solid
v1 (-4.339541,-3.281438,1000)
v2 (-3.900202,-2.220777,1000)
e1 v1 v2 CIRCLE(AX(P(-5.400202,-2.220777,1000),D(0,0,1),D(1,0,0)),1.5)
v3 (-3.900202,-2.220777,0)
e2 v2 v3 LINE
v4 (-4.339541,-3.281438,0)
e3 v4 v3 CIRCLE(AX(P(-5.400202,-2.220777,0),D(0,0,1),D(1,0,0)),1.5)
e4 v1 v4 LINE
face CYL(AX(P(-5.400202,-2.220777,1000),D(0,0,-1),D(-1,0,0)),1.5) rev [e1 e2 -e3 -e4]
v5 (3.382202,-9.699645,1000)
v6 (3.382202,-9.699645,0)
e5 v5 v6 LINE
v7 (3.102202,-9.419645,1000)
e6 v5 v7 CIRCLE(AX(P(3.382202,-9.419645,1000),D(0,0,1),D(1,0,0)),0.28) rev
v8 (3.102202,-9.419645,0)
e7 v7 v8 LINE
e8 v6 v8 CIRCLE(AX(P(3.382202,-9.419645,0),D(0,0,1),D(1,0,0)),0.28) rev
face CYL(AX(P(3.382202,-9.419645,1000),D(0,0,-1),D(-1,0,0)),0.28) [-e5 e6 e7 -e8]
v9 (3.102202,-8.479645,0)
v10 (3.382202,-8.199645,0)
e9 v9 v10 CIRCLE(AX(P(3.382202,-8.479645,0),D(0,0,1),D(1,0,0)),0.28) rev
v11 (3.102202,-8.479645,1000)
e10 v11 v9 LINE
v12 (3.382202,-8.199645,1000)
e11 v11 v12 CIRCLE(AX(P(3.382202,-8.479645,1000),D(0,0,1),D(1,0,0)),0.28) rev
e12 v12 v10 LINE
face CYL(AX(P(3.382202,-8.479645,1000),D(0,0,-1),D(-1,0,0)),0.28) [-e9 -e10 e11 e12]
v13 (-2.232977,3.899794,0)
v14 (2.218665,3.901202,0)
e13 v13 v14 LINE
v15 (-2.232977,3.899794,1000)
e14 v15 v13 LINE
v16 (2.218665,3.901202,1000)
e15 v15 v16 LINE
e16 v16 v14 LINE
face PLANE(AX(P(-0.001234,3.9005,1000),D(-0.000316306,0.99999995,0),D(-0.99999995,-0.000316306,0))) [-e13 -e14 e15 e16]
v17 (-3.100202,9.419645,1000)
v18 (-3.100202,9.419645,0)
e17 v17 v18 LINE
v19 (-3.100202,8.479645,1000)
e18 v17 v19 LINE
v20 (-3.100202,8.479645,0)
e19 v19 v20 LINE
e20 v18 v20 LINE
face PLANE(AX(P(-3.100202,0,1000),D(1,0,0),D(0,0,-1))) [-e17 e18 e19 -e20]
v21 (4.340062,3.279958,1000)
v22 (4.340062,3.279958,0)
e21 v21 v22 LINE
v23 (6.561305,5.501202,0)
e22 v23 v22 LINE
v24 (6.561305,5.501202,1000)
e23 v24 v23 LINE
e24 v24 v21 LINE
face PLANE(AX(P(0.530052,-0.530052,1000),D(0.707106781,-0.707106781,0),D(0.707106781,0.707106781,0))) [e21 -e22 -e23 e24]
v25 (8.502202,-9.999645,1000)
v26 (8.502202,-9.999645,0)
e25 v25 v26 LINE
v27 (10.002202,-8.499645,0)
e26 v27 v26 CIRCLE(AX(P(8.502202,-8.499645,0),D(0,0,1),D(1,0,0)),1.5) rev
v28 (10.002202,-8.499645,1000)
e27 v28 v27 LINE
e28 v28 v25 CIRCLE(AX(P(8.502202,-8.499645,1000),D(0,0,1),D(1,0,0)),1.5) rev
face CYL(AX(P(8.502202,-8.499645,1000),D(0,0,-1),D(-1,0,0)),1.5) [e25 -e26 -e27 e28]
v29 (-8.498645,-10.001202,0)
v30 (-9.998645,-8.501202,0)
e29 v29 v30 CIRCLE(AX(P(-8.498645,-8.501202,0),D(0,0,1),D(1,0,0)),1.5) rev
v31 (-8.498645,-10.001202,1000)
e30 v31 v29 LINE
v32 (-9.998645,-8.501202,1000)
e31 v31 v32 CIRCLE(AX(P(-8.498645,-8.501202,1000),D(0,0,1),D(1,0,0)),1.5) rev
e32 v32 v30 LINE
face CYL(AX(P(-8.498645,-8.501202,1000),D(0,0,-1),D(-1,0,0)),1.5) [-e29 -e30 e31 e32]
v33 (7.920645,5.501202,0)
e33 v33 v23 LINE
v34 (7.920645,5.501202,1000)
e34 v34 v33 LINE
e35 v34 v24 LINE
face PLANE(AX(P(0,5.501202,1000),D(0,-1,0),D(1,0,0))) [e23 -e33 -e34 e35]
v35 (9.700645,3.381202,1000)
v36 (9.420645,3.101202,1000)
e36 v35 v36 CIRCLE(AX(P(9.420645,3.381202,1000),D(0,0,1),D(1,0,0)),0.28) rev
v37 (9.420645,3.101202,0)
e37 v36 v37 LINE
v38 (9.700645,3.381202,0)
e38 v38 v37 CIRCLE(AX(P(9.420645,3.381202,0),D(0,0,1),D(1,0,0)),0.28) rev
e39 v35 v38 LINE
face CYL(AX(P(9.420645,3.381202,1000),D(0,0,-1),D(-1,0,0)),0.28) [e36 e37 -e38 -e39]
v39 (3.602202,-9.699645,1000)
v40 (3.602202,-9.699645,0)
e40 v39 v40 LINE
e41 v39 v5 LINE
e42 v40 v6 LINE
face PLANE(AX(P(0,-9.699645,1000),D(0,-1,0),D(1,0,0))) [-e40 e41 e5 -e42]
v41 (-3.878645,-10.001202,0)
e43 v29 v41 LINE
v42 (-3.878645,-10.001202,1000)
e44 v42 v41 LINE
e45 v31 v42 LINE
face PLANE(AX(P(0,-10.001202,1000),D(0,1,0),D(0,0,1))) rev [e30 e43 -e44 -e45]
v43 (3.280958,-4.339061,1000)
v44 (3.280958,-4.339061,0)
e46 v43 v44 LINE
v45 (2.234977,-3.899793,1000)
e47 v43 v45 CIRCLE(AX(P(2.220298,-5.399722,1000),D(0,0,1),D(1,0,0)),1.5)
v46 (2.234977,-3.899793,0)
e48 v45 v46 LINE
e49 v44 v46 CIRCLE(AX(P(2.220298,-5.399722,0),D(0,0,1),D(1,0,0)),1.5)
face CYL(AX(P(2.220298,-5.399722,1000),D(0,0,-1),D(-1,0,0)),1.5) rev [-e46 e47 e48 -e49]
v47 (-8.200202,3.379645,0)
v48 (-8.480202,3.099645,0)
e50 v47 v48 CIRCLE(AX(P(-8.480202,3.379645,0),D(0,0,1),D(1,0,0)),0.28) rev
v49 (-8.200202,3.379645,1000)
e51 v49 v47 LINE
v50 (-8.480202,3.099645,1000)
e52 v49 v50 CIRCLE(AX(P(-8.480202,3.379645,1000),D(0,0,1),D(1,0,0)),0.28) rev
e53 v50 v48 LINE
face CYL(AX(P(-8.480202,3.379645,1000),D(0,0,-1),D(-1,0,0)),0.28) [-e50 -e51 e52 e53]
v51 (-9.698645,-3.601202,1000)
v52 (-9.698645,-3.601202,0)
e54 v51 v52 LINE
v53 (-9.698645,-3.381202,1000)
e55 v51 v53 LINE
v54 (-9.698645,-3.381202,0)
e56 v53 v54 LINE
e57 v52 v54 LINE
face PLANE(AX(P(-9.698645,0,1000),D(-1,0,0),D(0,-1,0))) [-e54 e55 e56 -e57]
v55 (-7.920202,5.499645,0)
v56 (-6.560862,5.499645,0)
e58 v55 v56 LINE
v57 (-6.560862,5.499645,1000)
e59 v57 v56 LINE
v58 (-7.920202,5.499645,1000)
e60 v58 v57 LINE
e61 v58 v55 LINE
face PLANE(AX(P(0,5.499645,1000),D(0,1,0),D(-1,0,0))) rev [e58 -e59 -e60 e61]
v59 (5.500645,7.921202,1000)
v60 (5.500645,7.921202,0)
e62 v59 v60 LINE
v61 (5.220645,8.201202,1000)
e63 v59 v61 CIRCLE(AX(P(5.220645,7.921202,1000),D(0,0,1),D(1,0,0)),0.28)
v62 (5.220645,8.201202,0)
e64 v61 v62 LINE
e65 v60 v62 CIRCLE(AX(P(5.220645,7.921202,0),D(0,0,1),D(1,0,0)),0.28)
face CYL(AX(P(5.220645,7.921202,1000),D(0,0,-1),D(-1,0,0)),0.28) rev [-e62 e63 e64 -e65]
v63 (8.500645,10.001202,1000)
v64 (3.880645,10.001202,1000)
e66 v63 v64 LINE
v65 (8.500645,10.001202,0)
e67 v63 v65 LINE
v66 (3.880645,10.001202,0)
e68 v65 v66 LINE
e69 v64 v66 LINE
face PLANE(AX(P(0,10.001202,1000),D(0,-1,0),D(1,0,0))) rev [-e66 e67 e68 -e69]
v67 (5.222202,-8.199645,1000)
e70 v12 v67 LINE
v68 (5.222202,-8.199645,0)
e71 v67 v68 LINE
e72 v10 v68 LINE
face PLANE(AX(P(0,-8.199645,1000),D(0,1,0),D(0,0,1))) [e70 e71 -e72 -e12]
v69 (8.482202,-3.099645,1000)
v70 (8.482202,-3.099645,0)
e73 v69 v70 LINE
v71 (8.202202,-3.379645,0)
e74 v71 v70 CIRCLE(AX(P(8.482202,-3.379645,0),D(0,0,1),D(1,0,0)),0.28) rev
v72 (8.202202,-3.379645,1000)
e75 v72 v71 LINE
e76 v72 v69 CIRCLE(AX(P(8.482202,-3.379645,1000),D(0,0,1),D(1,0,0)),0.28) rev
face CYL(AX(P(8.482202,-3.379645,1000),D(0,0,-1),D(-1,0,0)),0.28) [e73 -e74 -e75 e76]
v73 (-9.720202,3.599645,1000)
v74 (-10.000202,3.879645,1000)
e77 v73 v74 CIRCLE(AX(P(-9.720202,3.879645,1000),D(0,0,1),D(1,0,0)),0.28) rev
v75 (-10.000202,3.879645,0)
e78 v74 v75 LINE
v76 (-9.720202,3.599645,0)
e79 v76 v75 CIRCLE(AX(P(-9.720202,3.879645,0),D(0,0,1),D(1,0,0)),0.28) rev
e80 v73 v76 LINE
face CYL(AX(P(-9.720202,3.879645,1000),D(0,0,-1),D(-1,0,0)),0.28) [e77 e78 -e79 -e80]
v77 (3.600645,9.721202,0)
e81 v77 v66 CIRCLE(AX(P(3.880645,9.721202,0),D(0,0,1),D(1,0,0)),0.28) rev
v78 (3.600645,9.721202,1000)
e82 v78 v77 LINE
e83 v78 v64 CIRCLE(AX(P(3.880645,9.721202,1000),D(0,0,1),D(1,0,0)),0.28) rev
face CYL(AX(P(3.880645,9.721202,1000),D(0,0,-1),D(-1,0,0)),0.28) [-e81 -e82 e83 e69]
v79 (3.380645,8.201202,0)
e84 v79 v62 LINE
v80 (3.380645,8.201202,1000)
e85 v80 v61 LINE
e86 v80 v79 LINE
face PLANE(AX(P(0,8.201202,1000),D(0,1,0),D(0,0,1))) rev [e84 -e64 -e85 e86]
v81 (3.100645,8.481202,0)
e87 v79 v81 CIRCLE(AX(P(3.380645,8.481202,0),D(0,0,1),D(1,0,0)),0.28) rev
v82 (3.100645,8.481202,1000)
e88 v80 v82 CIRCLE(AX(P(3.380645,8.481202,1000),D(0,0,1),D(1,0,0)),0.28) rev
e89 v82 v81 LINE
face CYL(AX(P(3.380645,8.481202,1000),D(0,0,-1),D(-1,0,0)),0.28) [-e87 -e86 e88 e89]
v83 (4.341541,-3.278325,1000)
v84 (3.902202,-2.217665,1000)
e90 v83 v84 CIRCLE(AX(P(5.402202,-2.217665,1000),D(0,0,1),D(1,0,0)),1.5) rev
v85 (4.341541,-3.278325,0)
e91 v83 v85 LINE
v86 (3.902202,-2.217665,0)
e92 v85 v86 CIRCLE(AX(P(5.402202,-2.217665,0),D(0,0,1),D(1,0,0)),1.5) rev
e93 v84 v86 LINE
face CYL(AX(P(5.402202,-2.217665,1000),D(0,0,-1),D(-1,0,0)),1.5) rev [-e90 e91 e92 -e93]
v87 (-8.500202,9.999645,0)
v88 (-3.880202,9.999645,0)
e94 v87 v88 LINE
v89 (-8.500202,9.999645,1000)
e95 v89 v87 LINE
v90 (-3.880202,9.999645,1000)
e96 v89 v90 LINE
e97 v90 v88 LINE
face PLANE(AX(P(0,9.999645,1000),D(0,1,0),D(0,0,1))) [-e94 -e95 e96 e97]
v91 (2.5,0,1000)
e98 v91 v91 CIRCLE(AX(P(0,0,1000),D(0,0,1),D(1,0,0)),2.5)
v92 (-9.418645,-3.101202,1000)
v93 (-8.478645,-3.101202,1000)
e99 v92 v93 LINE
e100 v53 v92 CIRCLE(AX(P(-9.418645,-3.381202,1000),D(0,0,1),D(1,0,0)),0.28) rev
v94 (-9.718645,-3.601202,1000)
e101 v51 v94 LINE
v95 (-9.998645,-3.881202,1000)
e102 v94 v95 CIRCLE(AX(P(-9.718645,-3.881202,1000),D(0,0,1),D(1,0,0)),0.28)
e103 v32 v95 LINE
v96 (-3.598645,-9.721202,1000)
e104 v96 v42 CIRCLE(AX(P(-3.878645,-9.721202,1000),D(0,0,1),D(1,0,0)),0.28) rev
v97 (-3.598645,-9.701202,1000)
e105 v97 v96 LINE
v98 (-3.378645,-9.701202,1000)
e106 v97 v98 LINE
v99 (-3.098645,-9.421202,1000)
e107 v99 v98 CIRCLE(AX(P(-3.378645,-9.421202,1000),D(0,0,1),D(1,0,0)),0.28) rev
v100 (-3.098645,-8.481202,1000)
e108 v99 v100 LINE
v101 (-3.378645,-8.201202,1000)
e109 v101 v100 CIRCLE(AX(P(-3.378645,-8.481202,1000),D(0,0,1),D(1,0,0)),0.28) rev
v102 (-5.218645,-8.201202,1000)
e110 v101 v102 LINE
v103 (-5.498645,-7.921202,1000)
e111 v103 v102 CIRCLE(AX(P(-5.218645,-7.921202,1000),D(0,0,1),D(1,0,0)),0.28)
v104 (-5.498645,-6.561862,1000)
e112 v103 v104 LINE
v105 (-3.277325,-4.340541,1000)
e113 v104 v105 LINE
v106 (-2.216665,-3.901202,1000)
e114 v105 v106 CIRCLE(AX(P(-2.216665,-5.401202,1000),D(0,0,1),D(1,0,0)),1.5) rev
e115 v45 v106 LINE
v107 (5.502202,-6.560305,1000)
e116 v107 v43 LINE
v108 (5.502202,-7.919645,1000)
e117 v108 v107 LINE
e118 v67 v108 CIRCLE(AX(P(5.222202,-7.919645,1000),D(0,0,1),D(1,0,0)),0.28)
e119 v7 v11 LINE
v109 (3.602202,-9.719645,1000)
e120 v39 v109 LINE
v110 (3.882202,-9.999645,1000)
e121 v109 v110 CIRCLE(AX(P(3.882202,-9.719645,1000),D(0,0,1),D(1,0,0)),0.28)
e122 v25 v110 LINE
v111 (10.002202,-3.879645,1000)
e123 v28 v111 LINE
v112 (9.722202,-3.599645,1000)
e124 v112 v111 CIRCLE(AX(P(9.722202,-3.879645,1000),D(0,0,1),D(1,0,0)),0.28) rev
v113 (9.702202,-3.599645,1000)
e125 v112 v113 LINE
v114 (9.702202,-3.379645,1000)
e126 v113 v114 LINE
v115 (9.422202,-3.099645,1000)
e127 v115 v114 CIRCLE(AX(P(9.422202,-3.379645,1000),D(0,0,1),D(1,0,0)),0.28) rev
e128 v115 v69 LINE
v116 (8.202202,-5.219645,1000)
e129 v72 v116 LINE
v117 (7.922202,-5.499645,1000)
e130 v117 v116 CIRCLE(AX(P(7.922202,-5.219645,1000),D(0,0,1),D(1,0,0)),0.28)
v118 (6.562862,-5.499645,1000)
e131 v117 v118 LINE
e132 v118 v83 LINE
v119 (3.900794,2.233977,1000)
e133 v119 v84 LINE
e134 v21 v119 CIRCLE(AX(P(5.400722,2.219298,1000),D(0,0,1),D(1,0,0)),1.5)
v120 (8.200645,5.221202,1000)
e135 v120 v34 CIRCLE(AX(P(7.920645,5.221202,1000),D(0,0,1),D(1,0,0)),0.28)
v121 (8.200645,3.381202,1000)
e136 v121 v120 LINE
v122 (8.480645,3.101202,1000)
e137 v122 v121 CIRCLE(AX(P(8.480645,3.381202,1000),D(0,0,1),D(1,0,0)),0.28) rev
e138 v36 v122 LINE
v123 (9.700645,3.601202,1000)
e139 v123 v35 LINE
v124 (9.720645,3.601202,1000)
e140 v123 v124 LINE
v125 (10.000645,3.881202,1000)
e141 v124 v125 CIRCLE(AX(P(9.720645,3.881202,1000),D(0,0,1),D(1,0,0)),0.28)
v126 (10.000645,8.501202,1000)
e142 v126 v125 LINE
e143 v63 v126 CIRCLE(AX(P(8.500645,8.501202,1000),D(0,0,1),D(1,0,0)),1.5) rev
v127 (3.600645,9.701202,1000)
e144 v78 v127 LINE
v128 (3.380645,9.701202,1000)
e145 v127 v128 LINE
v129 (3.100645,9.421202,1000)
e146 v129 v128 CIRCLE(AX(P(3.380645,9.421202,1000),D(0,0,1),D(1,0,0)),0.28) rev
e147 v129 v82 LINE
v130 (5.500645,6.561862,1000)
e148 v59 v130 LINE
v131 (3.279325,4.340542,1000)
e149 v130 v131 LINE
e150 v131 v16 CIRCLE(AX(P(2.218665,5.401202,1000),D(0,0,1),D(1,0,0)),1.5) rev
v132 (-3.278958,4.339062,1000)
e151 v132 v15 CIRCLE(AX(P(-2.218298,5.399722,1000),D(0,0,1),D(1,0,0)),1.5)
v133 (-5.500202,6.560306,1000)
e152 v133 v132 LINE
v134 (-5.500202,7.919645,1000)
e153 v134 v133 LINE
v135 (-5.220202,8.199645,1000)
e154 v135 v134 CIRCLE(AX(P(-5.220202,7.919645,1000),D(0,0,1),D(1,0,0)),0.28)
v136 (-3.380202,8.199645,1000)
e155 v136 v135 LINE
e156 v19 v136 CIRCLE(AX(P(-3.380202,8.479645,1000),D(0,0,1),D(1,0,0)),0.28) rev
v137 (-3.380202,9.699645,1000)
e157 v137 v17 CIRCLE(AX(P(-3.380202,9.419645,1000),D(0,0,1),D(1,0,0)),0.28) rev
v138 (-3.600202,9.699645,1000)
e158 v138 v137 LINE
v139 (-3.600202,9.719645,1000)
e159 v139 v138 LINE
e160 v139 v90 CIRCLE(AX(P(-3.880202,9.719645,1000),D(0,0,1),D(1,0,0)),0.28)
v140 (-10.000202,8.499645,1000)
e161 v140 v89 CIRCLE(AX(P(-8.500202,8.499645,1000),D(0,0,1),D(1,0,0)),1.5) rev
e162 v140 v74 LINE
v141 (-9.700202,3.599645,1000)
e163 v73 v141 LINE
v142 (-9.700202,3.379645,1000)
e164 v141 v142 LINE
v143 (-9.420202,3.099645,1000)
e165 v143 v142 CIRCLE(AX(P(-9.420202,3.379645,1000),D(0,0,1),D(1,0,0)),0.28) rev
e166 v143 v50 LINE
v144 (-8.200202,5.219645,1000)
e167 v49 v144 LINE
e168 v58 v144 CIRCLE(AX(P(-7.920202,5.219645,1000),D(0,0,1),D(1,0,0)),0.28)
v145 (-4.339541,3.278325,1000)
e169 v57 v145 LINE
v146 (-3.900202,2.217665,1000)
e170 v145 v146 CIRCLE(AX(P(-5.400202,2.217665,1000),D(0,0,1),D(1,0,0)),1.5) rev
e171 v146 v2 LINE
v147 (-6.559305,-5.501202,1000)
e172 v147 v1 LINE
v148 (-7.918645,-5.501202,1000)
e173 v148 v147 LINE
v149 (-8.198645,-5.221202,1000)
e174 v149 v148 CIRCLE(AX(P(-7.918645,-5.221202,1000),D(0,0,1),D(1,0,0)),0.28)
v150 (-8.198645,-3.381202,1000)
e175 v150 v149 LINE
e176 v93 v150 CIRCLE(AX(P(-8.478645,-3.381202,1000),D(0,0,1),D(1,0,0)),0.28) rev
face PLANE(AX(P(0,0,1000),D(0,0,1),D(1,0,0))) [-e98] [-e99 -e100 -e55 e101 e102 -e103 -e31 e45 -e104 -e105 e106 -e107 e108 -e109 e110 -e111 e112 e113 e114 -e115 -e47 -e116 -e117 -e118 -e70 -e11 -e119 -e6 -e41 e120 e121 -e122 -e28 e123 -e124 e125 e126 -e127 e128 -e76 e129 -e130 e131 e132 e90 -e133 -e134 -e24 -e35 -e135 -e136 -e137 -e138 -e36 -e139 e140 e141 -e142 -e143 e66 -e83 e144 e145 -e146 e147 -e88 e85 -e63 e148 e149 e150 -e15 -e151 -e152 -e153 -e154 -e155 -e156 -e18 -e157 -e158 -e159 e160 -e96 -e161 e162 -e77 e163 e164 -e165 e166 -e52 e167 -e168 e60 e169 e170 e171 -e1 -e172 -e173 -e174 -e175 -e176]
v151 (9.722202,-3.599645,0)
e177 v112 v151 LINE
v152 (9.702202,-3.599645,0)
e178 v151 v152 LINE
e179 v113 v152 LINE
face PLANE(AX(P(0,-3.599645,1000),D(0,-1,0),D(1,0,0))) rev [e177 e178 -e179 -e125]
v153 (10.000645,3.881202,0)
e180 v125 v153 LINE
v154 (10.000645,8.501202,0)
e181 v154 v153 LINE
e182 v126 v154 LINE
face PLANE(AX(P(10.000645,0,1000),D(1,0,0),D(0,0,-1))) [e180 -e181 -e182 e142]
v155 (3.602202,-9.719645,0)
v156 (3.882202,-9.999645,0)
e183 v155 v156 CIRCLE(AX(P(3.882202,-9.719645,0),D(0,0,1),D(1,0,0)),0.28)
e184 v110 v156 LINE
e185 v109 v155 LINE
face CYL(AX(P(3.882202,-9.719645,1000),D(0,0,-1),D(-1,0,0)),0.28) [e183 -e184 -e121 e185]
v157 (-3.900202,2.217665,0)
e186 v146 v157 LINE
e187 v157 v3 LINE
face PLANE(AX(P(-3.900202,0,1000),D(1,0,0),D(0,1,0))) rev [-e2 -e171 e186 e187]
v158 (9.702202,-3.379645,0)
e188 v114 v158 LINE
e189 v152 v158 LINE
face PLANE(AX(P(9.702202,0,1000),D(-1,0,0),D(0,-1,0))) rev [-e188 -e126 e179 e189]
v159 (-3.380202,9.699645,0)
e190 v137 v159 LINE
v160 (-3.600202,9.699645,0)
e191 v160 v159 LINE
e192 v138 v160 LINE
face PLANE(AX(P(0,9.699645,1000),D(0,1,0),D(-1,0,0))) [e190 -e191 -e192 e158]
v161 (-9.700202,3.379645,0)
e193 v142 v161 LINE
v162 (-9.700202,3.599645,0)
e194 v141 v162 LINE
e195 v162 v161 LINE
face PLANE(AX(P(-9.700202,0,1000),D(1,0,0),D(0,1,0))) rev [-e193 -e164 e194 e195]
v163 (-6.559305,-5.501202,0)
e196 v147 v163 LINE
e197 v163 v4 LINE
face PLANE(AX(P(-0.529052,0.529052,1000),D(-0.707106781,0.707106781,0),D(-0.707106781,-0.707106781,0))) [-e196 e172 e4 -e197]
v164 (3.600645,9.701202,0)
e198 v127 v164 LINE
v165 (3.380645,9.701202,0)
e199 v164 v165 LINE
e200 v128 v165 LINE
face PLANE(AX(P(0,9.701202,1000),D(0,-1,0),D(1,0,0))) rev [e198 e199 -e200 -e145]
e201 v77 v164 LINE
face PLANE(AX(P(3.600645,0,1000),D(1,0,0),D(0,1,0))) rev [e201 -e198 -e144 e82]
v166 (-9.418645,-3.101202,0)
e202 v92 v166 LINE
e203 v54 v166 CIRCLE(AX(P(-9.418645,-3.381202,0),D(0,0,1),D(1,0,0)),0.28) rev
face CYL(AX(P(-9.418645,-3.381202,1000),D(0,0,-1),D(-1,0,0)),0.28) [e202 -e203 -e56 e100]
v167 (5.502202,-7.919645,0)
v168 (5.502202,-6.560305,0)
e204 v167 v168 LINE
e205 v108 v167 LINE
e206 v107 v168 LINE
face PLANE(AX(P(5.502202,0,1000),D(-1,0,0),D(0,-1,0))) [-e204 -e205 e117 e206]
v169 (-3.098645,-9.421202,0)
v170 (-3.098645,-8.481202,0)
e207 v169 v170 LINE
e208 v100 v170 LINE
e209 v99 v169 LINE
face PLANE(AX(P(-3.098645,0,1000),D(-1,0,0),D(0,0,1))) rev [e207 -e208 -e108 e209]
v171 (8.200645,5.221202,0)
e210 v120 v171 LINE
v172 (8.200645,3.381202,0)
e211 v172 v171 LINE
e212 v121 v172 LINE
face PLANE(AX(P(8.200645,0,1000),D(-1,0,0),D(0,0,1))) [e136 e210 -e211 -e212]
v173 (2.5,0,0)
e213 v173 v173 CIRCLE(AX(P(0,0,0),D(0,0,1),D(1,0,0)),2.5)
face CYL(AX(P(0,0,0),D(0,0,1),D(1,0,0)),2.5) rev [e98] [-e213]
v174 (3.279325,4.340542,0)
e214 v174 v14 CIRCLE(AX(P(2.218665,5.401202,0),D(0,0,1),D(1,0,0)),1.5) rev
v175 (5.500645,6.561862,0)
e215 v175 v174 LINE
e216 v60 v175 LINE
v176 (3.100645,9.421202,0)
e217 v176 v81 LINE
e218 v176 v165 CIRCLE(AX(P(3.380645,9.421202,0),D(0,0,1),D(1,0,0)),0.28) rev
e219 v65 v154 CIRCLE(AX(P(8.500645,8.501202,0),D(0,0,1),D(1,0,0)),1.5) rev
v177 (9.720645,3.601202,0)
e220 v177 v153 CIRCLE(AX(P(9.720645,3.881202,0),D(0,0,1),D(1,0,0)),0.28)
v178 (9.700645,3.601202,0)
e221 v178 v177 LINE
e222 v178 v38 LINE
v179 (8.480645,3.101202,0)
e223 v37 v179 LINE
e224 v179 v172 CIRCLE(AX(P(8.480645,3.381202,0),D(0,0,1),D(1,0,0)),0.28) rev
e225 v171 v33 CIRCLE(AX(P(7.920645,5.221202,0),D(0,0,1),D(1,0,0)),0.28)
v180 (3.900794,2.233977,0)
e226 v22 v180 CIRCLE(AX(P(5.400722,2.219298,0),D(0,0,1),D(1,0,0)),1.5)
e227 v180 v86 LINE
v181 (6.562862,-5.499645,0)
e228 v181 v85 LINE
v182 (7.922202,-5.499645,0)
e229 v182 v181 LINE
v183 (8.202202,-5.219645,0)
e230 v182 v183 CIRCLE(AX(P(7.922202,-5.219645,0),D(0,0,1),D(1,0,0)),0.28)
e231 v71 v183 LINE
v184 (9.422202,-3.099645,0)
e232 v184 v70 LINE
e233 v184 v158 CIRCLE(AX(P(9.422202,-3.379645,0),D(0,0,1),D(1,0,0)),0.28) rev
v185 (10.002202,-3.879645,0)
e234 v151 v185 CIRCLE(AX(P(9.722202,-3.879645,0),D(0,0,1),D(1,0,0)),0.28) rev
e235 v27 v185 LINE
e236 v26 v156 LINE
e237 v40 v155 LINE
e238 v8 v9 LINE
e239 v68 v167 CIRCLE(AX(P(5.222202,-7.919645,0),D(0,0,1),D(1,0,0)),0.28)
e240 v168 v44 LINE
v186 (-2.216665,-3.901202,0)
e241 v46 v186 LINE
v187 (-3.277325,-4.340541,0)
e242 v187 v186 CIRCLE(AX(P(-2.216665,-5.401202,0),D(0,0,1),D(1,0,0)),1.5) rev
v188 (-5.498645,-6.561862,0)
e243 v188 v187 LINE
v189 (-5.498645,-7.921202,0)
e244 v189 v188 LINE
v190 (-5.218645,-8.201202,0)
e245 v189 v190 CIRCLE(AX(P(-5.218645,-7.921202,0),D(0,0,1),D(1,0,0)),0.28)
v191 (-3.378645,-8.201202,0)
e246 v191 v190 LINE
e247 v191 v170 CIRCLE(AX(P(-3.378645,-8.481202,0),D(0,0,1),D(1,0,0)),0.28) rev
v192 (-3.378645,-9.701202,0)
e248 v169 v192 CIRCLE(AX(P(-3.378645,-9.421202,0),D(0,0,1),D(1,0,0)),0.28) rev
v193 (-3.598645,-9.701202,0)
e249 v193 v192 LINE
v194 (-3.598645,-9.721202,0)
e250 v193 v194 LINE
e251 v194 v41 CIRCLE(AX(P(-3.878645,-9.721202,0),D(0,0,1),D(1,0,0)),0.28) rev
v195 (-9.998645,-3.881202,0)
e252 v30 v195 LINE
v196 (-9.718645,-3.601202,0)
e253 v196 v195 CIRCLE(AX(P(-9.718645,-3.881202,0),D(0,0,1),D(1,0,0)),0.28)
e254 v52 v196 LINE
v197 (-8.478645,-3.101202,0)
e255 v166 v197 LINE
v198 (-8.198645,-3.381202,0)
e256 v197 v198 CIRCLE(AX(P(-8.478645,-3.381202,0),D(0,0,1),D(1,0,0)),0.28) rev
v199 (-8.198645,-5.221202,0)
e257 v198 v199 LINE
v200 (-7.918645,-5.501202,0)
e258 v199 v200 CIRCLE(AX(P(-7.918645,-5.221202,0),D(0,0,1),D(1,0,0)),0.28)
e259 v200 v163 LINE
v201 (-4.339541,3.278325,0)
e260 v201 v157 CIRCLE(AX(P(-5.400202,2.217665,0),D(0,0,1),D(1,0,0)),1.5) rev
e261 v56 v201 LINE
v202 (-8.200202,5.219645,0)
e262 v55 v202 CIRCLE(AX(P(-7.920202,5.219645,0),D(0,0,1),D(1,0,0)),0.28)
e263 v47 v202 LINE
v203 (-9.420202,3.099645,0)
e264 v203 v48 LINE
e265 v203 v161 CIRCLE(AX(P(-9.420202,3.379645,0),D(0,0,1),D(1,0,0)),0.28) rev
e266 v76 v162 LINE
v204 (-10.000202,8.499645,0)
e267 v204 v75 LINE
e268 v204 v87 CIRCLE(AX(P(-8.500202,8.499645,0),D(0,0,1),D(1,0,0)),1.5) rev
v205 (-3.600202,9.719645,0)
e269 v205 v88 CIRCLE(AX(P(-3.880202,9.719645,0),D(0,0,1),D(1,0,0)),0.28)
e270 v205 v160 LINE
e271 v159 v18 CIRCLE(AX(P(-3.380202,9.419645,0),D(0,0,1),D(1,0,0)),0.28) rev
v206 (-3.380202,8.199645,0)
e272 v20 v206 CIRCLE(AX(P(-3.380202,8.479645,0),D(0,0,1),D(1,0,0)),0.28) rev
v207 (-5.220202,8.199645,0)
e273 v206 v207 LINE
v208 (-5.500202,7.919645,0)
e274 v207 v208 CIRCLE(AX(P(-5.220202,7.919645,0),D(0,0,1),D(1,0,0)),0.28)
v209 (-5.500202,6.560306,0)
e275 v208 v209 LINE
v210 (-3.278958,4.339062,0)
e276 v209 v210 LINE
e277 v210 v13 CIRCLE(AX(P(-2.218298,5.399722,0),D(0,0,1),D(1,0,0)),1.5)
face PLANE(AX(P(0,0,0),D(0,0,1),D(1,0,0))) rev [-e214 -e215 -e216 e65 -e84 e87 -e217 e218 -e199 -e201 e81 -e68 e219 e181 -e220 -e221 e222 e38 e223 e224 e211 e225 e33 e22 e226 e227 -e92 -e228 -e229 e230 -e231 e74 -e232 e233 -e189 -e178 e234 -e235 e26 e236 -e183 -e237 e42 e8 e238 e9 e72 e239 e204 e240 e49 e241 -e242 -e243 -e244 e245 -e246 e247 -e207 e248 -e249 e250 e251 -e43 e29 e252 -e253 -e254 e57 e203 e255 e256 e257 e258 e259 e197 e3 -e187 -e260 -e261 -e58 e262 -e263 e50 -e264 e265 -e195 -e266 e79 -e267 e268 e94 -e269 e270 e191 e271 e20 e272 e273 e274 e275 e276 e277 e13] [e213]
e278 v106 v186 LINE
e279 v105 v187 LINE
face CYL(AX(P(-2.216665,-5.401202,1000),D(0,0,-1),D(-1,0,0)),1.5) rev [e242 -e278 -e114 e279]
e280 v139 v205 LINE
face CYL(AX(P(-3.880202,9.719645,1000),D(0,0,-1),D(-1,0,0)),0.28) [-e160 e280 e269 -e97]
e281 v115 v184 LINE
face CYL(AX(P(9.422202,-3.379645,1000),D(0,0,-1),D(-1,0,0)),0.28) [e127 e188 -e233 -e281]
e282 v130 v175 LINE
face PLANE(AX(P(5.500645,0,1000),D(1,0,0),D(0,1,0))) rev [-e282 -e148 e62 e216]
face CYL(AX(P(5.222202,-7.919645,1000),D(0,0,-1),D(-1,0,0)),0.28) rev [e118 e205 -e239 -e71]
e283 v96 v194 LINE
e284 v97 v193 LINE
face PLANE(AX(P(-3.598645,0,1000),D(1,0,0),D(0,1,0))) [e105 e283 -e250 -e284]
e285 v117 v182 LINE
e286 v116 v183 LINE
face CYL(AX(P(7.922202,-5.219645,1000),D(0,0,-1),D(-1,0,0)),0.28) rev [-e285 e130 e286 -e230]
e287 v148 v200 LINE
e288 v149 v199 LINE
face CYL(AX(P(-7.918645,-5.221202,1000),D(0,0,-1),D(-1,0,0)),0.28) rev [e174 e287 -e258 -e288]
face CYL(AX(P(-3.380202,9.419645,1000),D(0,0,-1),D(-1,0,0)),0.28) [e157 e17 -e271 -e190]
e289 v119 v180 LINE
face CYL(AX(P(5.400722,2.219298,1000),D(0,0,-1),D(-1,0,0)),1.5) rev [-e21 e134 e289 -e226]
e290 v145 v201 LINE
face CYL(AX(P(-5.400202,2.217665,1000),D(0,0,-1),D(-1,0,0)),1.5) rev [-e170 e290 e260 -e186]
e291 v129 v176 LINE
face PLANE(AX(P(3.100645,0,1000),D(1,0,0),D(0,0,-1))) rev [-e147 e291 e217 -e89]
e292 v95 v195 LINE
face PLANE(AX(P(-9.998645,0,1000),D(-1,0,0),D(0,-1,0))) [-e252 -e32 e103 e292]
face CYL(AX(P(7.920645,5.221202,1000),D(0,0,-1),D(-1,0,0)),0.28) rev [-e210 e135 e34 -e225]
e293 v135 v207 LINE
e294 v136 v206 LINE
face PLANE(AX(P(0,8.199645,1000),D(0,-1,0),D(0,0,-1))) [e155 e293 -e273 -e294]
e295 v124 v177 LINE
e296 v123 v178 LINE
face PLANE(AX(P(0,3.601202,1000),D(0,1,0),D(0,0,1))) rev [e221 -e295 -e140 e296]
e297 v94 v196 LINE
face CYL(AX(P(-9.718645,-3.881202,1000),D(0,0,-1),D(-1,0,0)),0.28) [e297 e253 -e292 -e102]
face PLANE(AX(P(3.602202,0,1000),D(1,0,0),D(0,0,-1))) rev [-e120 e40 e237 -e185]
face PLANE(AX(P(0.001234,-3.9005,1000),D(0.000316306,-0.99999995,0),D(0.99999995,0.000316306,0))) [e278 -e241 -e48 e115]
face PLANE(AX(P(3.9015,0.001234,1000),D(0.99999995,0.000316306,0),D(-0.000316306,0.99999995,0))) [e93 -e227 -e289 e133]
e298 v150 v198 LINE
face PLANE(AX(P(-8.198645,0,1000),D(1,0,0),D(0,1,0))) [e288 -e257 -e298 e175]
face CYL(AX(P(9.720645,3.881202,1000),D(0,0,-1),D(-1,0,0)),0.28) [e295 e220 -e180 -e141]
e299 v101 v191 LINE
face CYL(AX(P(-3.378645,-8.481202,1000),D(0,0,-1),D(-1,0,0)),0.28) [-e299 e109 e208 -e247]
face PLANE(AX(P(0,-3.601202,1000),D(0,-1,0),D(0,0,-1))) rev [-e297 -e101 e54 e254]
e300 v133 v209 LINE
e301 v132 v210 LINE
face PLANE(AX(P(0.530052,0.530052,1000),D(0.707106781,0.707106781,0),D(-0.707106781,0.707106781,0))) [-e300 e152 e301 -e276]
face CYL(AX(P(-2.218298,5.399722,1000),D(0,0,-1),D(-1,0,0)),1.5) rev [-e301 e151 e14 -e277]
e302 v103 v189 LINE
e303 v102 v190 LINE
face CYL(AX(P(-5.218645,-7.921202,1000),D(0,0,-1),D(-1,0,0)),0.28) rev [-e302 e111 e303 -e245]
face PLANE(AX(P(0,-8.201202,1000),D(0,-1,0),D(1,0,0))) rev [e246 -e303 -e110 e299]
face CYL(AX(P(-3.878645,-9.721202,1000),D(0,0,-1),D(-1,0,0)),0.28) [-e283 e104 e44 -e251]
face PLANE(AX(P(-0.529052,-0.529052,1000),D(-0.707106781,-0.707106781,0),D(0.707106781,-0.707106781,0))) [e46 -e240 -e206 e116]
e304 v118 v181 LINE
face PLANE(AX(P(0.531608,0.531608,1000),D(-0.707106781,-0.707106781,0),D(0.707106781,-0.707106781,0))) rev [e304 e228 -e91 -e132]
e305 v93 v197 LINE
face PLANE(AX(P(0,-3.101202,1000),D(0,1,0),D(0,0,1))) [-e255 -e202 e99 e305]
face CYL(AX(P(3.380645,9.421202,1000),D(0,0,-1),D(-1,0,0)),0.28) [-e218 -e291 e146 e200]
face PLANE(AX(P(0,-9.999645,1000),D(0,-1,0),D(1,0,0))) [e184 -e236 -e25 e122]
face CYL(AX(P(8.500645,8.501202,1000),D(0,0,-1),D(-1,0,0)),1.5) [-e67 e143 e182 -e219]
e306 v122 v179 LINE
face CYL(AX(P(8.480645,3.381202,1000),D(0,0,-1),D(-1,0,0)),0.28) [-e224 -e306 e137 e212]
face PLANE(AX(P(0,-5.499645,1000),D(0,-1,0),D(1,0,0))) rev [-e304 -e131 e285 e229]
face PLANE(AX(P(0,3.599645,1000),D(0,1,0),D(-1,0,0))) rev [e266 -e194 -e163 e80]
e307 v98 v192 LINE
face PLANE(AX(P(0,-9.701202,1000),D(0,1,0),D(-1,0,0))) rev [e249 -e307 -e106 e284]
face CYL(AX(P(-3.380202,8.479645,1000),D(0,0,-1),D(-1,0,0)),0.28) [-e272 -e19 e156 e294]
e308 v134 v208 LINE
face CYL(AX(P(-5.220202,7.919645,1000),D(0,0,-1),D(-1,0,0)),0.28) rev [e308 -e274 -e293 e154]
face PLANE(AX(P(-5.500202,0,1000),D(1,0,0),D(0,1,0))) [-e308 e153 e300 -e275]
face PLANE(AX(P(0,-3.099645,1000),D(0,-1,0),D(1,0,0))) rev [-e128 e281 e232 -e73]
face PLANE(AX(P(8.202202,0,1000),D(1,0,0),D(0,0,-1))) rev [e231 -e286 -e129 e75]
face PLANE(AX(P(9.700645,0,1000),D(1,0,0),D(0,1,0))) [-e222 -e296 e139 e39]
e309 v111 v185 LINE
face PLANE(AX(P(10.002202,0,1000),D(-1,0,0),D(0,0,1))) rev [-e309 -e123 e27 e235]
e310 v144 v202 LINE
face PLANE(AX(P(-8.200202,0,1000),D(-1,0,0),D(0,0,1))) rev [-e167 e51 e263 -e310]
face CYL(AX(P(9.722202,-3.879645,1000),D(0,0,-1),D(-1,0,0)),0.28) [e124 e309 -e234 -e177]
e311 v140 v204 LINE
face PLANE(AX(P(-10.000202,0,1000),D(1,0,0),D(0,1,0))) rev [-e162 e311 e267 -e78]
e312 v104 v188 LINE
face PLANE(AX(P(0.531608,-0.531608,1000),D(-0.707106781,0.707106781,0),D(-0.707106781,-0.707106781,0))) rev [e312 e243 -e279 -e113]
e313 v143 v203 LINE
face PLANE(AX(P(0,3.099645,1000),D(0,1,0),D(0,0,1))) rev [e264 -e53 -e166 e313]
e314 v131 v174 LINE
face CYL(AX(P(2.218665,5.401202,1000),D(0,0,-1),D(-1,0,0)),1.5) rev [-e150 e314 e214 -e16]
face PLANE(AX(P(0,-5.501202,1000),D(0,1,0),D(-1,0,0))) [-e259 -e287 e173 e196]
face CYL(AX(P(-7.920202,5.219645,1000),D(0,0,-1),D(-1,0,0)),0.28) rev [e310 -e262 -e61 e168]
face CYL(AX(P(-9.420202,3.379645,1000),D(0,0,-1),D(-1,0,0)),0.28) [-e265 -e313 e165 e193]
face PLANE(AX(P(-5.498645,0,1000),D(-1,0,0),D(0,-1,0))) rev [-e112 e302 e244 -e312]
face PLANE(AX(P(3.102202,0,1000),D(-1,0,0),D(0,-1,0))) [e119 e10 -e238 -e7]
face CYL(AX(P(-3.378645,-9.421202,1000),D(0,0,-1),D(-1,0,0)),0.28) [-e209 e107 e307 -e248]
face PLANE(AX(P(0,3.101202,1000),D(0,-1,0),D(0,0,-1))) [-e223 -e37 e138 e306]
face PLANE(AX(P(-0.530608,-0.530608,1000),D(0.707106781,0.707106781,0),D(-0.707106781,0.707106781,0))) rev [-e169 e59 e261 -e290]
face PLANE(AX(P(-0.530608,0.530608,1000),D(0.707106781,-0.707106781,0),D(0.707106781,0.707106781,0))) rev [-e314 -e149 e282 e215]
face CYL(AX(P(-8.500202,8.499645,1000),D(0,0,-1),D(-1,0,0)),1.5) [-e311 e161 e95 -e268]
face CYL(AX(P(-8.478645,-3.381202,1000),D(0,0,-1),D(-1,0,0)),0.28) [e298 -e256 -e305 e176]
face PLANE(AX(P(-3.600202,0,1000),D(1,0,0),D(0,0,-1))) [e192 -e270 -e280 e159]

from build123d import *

# Parameters (mm, degrees)
BOSS_EXTRUDE1_DEPTH = 1000
F_3DSKETCH2_R       = 2.5
CUT_EXTRUDE1_DEPTH  = 1001.100029035


with BuildPart() as part:
    # Sketch1 → Boss-Extrude1 (new body)
    with BuildSketch(Plane.XY):
        with BuildLine():
            ThreePointArc((-4.339541497, 3.27832502), (-4.01438237, 2.791689997), (-3.900201668, 2.217664848))
            Line((-3.900201668, 2.217664848), (-3.900201668, -2.220777458))
            ThreePointArc((-3.900201668, -2.220777458), (-4.013982246, -2.793835668), (-4.338062619, -3.279956687))
            ThreePointArc((-4.338062619, -3.279956687), (-4.338801799, -3.280697416), (-4.339541497, -3.28143763))
            Line((-4.339541497, -3.28143763), (-6.559305445, -5.501201578))
            Line((-6.559305445, -5.501201578), (-7.918645273, -5.501201578))
            ThreePointArc((-7.918645273, -5.501201578), (-8.116635172, -5.419191476), (-8.198645273, -5.221201578))
            Line((-8.198645273, -5.221201578), (-8.198645273, -3.381201578))
            ThreePointArc((-8.198645273, -3.381201578), (-8.280655374, -3.183211679), (-8.478645273, -3.101201578))
            Line((-8.478645273, -3.101201578), (-9.418645273, -3.101201578))
            ThreePointArc((-9.418645273, -3.101201578), (-9.616635172, -3.183211679), (-9.698645273, -3.381201578))
            Line((-9.698645273, -3.381201578), (-9.698645273, -3.601201578))
            Line((-9.698645273, -3.601201578), (-9.718645273, -3.601201578))
            ThreePointArc((-9.718645273, -3.601201578), (-9.916635172, -3.683211679), (-9.998645273, -3.881201578))
            Line((-9.998645273, -3.881201578), (-9.998645273, -8.501201578))
            ThreePointArc((-9.998645273, -8.501201578), (-9.559305445, -9.561861749), (-8.498645273, -10.001201578))
            Line((-8.498645273, -10.001201578), (-3.878645273, -10.001201578))
            ThreePointArc((-3.878645273, -10.001201578), (-3.680655374, -9.919191476), (-3.598645273, -9.721201578))
            Line((-3.598645273, -9.721201578), (-3.598645273, -9.701201578))
            Line((-3.598645273, -9.701201578), (-3.378645273, -9.701201578))
            ThreePointArc((-3.378645273, -9.701201578), (-3.180655374, -9.619191476), (-3.098645273, -9.421201578))
            Line((-3.098645273, -9.421201578), (-3.098645273, -8.481201578))
            ThreePointArc((-3.098645273, -8.481201578), (-3.180655374, -8.283211679), (-3.378645273, -8.201201578))
            Line((-3.378645273, -8.201201578), (-5.218645273, -8.201201578))
            ThreePointArc((-5.218645273, -8.201201578), (-5.416635172, -8.119191476), (-5.498645273, -7.921201578))
            Line((-5.498645273, -7.921201578), (-5.498645273, -6.561861749))
            Line((-5.498645273, -6.561861749), (-3.277324929, -4.340541406))
            ThreePointArc((-3.277324929, -4.340541406), (-2.790689906, -4.015382279), (-2.216664757, -3.901201578))
            Line((-2.216664757, -3.901201578), (2.234977304, -3.899793498))
            ThreePointArc((2.234977304, -3.899793498), (2.801097117, -4.016727825), (3.280957809, -4.339061494))
            Line((3.280957809, -4.339061494), (5.502201668, -6.560305354))
            Line((5.502201668, -6.560305354), (5.502201668, -7.919645182))
            ThreePointArc((5.502201668, -7.919645182), (5.420191567, -8.117635081), (5.222201668, -8.199645182))
            Line((5.222201668, -8.199645182), (3.382201668, -8.199645182))
            ThreePointArc((3.382201668, -8.199645182), (3.18421177, -8.281655283), (3.102201668, -8.479645182))
            Line((3.102201668, -8.479645182), (3.102201668, -9.419645182))
            ThreePointArc((3.102201668, -9.419645182), (3.18421177, -9.617635081), (3.382201668, -9.699645182))
            Line((3.382201668, -9.699645182), (3.602201668, -9.699645182))
            Line((3.602201668, -9.699645182), (3.602201668, -9.719645182))
            ThreePointArc((3.602201668, -9.719645182), (3.68421177, -9.917635081), (3.882201668, -9.999645182))
            Line((3.882201668, -9.999645182), (8.502201668, -9.999645182))
            ThreePointArc((8.502201668, -9.999645182), (9.56286184, -9.560305354), (10.002201668, -8.499645182))
            Line((10.002201668, -8.499645182), (10.002201668, -3.879645182))
            ThreePointArc((10.002201668, -3.879645182), (9.920191567, -3.681655283), (9.722201668, -3.599645182))
            Line((9.722201668, -3.599645182), (9.702201668, -3.599645182))
            Line((9.702201668, -3.599645182), (9.702201668, -3.379645182))
            ThreePointArc((9.702201668, -3.379645182), (9.620191567, -3.181655283), (9.422201668, -3.099645182))
            Line((9.422201668, -3.099645182), (8.482201668, -3.099645182))
            ThreePointArc((8.482201668, -3.099645182), (8.28421177, -3.181655283), (8.202201668, -3.379645182))
            Line((8.202201668, -3.379645182), (8.202201668, -5.219645182))
            ThreePointArc((8.202201668, -5.219645182), (8.120191567, -5.417635081), (7.922201668, -5.499645182))
            Line((7.922201668, -5.499645182), (6.56286184, -5.499645182))
            Line((6.56286184, -5.499645182), (4.341541497, -3.278324838))
            ThreePointArc((4.341541497, -3.278324838), (4.01638237, -2.791689815), (3.902201668, -2.217664667))
            Line((3.902201668, -2.217664667), (3.900793589, 2.233977395))
            ThreePointArc((3.900793589, 2.233977395), (4.017727916, 2.800097207), (4.340061585, 3.2799579))
            Line((4.340061585, 3.2799579), (6.561305445, 5.501201759))
            Line((6.561305445, 5.501201759), (7.920645273, 5.501201759))
            ThreePointArc((7.920645273, 5.501201759), (8.118635172, 5.419191658), (8.200645273, 5.221201759))
            Line((8.200645273, 5.221201759), (8.200645273, 3.381201759))
            ThreePointArc((8.200645273, 3.381201759), (8.282655374, 3.183211861), (8.480645273, 3.101201759))
            Line((8.480645273, 3.101201759), (9.420645273, 3.101201759))
            ThreePointArc((9.420645273, 3.101201759), (9.618635172, 3.183211861), (9.700645273, 3.381201759))
            Line((9.700645273, 3.381201759), (9.700645273, 3.601201759))
            Line((9.700645273, 3.601201759), (9.720645273, 3.601201759))
            ThreePointArc((9.720645273, 3.601201759), (9.918635172, 3.683211861), (10.000645273, 3.881201759))
            Line((10.000645273, 3.881201759), (10.000645273, 8.501201759))
            ThreePointArc((10.000645273, 8.501201759), (9.561305445, 9.561861931), (8.500645273, 10.001201759))
            Line((8.500645273, 10.001201759), (3.880645273, 10.001201759))
            ThreePointArc((3.880645273, 10.001201759), (3.682655374, 9.919191658), (3.600645273, 9.721201759))
            Line((3.600645273, 9.721201759), (3.600645273, 9.701201759))
            Line((3.600645273, 9.701201759), (3.380645273, 9.701201759))
            ThreePointArc((3.380645273, 9.701201759), (3.182655374, 9.619191658), (3.100645273, 9.421201759))
            Line((3.100645273, 9.421201759), (3.100645273, 8.481201759))
            ThreePointArc((3.100645273, 8.481201759), (3.182655374, 8.283211861), (3.380645273, 8.201201759))
            Line((3.380645273, 8.201201759), (5.220645273, 8.201201759))
            ThreePointArc((5.220645273, 8.201201759), (5.418635172, 8.119191658), (5.500645273, 7.921201759))
            Line((5.500645273, 7.921201759), (5.500645273, 6.561861931))
            Line((5.500645273, 6.561861931), (3.279324929, 4.340541588))
            ThreePointArc((3.279324929, 4.340541588), (2.792689906, 4.015382461), (2.218664757, 3.901201759))
            Line((2.218664757, 3.901201759), (-2.232977304, 3.89979368))
            ThreePointArc((-2.232977304, 3.89979368), (-2.799097117, 4.016728006), (-3.278957809, 4.339061676))
            Line((-3.278957809, 4.339061676), (-5.500201668, 6.560305535))
            Line((-5.500201668, 6.560305535), (-5.500201668, 7.919645364))
            ThreePointArc((-5.500201668, 7.919645364), (-5.418191567, 8.117635262), (-5.220201668, 8.199645364))
            Line((-5.220201668, 8.199645364), (-3.380201668, 8.199645364))
            ThreePointArc((-3.380201668, 8.199645364), (-3.18221177, 8.281655465), (-3.100201668, 8.479645364))
            Line((-3.100201668, 8.479645364), (-3.100201668, 9.419645364))
            ThreePointArc((-3.100201668, 9.419645364), (-3.18221177, 9.617635262), (-3.380201668, 9.699645364))
            Line((-3.380201668, 9.699645364), (-3.600201668, 9.699645364))
            Line((-3.600201668, 9.699645364), (-3.600201668, 9.719645364))
            ThreePointArc((-3.600201668, 9.719645364), (-3.68221177, 9.917635262), (-3.880201668, 9.999645364))
            Line((-3.880201668, 9.999645364), (-8.500201668, 9.999645364))
            ThreePointArc((-8.500201668, 9.999645364), (-9.56086184, 9.560305535), (-10.000201668, 8.499645364))
            Line((-10.000201668, 8.499645364), (-10.000201668, 3.879645364))
            ThreePointArc((-10.000201668, 3.879645364), (-9.918191567, 3.681655465), (-9.720201668, 3.599645364))
            Line((-9.720201668, 3.599645364), (-9.700201668, 3.599645364))
            Line((-9.700201668, 3.599645364), (-9.700201668, 3.379645364))
            ThreePointArc((-9.700201668, 3.379645364), (-9.618191567, 3.181655465), (-9.420201668, 3.099645364))
            Line((-9.420201668, 3.099645364), (-8.480201668, 3.099645364))
            ThreePointArc((-8.480201668, 3.099645364), (-8.28221177, 3.181655465), (-8.200201668, 3.379645364))
            Line((-8.200201668, 3.379645364), (-8.200201668, 5.219645364))
            ThreePointArc((-8.200201668, 5.219645364), (-8.118191567, 5.417635262), (-7.920201668, 5.499645364))
            Line((-7.920201668, 5.499645364), (-6.56086184, 5.499645364))
            Line((-6.56086184, 5.499645364), (-4.339541497, 3.27832502))
        make_face()
    extrude(amount=BOSS_EXTRUDE1_DEPTH)

    # 3DSketch2 → Cut-Extrude1 (cut, through all)
    with BuildSketch(Plane.XY):
        Circle(F_3DSKETCH2_R)
    extrude(amount=CUT_EXTRUDE1_DEPTH, mode=Mode.SUBTRACT)


solid = part.part
